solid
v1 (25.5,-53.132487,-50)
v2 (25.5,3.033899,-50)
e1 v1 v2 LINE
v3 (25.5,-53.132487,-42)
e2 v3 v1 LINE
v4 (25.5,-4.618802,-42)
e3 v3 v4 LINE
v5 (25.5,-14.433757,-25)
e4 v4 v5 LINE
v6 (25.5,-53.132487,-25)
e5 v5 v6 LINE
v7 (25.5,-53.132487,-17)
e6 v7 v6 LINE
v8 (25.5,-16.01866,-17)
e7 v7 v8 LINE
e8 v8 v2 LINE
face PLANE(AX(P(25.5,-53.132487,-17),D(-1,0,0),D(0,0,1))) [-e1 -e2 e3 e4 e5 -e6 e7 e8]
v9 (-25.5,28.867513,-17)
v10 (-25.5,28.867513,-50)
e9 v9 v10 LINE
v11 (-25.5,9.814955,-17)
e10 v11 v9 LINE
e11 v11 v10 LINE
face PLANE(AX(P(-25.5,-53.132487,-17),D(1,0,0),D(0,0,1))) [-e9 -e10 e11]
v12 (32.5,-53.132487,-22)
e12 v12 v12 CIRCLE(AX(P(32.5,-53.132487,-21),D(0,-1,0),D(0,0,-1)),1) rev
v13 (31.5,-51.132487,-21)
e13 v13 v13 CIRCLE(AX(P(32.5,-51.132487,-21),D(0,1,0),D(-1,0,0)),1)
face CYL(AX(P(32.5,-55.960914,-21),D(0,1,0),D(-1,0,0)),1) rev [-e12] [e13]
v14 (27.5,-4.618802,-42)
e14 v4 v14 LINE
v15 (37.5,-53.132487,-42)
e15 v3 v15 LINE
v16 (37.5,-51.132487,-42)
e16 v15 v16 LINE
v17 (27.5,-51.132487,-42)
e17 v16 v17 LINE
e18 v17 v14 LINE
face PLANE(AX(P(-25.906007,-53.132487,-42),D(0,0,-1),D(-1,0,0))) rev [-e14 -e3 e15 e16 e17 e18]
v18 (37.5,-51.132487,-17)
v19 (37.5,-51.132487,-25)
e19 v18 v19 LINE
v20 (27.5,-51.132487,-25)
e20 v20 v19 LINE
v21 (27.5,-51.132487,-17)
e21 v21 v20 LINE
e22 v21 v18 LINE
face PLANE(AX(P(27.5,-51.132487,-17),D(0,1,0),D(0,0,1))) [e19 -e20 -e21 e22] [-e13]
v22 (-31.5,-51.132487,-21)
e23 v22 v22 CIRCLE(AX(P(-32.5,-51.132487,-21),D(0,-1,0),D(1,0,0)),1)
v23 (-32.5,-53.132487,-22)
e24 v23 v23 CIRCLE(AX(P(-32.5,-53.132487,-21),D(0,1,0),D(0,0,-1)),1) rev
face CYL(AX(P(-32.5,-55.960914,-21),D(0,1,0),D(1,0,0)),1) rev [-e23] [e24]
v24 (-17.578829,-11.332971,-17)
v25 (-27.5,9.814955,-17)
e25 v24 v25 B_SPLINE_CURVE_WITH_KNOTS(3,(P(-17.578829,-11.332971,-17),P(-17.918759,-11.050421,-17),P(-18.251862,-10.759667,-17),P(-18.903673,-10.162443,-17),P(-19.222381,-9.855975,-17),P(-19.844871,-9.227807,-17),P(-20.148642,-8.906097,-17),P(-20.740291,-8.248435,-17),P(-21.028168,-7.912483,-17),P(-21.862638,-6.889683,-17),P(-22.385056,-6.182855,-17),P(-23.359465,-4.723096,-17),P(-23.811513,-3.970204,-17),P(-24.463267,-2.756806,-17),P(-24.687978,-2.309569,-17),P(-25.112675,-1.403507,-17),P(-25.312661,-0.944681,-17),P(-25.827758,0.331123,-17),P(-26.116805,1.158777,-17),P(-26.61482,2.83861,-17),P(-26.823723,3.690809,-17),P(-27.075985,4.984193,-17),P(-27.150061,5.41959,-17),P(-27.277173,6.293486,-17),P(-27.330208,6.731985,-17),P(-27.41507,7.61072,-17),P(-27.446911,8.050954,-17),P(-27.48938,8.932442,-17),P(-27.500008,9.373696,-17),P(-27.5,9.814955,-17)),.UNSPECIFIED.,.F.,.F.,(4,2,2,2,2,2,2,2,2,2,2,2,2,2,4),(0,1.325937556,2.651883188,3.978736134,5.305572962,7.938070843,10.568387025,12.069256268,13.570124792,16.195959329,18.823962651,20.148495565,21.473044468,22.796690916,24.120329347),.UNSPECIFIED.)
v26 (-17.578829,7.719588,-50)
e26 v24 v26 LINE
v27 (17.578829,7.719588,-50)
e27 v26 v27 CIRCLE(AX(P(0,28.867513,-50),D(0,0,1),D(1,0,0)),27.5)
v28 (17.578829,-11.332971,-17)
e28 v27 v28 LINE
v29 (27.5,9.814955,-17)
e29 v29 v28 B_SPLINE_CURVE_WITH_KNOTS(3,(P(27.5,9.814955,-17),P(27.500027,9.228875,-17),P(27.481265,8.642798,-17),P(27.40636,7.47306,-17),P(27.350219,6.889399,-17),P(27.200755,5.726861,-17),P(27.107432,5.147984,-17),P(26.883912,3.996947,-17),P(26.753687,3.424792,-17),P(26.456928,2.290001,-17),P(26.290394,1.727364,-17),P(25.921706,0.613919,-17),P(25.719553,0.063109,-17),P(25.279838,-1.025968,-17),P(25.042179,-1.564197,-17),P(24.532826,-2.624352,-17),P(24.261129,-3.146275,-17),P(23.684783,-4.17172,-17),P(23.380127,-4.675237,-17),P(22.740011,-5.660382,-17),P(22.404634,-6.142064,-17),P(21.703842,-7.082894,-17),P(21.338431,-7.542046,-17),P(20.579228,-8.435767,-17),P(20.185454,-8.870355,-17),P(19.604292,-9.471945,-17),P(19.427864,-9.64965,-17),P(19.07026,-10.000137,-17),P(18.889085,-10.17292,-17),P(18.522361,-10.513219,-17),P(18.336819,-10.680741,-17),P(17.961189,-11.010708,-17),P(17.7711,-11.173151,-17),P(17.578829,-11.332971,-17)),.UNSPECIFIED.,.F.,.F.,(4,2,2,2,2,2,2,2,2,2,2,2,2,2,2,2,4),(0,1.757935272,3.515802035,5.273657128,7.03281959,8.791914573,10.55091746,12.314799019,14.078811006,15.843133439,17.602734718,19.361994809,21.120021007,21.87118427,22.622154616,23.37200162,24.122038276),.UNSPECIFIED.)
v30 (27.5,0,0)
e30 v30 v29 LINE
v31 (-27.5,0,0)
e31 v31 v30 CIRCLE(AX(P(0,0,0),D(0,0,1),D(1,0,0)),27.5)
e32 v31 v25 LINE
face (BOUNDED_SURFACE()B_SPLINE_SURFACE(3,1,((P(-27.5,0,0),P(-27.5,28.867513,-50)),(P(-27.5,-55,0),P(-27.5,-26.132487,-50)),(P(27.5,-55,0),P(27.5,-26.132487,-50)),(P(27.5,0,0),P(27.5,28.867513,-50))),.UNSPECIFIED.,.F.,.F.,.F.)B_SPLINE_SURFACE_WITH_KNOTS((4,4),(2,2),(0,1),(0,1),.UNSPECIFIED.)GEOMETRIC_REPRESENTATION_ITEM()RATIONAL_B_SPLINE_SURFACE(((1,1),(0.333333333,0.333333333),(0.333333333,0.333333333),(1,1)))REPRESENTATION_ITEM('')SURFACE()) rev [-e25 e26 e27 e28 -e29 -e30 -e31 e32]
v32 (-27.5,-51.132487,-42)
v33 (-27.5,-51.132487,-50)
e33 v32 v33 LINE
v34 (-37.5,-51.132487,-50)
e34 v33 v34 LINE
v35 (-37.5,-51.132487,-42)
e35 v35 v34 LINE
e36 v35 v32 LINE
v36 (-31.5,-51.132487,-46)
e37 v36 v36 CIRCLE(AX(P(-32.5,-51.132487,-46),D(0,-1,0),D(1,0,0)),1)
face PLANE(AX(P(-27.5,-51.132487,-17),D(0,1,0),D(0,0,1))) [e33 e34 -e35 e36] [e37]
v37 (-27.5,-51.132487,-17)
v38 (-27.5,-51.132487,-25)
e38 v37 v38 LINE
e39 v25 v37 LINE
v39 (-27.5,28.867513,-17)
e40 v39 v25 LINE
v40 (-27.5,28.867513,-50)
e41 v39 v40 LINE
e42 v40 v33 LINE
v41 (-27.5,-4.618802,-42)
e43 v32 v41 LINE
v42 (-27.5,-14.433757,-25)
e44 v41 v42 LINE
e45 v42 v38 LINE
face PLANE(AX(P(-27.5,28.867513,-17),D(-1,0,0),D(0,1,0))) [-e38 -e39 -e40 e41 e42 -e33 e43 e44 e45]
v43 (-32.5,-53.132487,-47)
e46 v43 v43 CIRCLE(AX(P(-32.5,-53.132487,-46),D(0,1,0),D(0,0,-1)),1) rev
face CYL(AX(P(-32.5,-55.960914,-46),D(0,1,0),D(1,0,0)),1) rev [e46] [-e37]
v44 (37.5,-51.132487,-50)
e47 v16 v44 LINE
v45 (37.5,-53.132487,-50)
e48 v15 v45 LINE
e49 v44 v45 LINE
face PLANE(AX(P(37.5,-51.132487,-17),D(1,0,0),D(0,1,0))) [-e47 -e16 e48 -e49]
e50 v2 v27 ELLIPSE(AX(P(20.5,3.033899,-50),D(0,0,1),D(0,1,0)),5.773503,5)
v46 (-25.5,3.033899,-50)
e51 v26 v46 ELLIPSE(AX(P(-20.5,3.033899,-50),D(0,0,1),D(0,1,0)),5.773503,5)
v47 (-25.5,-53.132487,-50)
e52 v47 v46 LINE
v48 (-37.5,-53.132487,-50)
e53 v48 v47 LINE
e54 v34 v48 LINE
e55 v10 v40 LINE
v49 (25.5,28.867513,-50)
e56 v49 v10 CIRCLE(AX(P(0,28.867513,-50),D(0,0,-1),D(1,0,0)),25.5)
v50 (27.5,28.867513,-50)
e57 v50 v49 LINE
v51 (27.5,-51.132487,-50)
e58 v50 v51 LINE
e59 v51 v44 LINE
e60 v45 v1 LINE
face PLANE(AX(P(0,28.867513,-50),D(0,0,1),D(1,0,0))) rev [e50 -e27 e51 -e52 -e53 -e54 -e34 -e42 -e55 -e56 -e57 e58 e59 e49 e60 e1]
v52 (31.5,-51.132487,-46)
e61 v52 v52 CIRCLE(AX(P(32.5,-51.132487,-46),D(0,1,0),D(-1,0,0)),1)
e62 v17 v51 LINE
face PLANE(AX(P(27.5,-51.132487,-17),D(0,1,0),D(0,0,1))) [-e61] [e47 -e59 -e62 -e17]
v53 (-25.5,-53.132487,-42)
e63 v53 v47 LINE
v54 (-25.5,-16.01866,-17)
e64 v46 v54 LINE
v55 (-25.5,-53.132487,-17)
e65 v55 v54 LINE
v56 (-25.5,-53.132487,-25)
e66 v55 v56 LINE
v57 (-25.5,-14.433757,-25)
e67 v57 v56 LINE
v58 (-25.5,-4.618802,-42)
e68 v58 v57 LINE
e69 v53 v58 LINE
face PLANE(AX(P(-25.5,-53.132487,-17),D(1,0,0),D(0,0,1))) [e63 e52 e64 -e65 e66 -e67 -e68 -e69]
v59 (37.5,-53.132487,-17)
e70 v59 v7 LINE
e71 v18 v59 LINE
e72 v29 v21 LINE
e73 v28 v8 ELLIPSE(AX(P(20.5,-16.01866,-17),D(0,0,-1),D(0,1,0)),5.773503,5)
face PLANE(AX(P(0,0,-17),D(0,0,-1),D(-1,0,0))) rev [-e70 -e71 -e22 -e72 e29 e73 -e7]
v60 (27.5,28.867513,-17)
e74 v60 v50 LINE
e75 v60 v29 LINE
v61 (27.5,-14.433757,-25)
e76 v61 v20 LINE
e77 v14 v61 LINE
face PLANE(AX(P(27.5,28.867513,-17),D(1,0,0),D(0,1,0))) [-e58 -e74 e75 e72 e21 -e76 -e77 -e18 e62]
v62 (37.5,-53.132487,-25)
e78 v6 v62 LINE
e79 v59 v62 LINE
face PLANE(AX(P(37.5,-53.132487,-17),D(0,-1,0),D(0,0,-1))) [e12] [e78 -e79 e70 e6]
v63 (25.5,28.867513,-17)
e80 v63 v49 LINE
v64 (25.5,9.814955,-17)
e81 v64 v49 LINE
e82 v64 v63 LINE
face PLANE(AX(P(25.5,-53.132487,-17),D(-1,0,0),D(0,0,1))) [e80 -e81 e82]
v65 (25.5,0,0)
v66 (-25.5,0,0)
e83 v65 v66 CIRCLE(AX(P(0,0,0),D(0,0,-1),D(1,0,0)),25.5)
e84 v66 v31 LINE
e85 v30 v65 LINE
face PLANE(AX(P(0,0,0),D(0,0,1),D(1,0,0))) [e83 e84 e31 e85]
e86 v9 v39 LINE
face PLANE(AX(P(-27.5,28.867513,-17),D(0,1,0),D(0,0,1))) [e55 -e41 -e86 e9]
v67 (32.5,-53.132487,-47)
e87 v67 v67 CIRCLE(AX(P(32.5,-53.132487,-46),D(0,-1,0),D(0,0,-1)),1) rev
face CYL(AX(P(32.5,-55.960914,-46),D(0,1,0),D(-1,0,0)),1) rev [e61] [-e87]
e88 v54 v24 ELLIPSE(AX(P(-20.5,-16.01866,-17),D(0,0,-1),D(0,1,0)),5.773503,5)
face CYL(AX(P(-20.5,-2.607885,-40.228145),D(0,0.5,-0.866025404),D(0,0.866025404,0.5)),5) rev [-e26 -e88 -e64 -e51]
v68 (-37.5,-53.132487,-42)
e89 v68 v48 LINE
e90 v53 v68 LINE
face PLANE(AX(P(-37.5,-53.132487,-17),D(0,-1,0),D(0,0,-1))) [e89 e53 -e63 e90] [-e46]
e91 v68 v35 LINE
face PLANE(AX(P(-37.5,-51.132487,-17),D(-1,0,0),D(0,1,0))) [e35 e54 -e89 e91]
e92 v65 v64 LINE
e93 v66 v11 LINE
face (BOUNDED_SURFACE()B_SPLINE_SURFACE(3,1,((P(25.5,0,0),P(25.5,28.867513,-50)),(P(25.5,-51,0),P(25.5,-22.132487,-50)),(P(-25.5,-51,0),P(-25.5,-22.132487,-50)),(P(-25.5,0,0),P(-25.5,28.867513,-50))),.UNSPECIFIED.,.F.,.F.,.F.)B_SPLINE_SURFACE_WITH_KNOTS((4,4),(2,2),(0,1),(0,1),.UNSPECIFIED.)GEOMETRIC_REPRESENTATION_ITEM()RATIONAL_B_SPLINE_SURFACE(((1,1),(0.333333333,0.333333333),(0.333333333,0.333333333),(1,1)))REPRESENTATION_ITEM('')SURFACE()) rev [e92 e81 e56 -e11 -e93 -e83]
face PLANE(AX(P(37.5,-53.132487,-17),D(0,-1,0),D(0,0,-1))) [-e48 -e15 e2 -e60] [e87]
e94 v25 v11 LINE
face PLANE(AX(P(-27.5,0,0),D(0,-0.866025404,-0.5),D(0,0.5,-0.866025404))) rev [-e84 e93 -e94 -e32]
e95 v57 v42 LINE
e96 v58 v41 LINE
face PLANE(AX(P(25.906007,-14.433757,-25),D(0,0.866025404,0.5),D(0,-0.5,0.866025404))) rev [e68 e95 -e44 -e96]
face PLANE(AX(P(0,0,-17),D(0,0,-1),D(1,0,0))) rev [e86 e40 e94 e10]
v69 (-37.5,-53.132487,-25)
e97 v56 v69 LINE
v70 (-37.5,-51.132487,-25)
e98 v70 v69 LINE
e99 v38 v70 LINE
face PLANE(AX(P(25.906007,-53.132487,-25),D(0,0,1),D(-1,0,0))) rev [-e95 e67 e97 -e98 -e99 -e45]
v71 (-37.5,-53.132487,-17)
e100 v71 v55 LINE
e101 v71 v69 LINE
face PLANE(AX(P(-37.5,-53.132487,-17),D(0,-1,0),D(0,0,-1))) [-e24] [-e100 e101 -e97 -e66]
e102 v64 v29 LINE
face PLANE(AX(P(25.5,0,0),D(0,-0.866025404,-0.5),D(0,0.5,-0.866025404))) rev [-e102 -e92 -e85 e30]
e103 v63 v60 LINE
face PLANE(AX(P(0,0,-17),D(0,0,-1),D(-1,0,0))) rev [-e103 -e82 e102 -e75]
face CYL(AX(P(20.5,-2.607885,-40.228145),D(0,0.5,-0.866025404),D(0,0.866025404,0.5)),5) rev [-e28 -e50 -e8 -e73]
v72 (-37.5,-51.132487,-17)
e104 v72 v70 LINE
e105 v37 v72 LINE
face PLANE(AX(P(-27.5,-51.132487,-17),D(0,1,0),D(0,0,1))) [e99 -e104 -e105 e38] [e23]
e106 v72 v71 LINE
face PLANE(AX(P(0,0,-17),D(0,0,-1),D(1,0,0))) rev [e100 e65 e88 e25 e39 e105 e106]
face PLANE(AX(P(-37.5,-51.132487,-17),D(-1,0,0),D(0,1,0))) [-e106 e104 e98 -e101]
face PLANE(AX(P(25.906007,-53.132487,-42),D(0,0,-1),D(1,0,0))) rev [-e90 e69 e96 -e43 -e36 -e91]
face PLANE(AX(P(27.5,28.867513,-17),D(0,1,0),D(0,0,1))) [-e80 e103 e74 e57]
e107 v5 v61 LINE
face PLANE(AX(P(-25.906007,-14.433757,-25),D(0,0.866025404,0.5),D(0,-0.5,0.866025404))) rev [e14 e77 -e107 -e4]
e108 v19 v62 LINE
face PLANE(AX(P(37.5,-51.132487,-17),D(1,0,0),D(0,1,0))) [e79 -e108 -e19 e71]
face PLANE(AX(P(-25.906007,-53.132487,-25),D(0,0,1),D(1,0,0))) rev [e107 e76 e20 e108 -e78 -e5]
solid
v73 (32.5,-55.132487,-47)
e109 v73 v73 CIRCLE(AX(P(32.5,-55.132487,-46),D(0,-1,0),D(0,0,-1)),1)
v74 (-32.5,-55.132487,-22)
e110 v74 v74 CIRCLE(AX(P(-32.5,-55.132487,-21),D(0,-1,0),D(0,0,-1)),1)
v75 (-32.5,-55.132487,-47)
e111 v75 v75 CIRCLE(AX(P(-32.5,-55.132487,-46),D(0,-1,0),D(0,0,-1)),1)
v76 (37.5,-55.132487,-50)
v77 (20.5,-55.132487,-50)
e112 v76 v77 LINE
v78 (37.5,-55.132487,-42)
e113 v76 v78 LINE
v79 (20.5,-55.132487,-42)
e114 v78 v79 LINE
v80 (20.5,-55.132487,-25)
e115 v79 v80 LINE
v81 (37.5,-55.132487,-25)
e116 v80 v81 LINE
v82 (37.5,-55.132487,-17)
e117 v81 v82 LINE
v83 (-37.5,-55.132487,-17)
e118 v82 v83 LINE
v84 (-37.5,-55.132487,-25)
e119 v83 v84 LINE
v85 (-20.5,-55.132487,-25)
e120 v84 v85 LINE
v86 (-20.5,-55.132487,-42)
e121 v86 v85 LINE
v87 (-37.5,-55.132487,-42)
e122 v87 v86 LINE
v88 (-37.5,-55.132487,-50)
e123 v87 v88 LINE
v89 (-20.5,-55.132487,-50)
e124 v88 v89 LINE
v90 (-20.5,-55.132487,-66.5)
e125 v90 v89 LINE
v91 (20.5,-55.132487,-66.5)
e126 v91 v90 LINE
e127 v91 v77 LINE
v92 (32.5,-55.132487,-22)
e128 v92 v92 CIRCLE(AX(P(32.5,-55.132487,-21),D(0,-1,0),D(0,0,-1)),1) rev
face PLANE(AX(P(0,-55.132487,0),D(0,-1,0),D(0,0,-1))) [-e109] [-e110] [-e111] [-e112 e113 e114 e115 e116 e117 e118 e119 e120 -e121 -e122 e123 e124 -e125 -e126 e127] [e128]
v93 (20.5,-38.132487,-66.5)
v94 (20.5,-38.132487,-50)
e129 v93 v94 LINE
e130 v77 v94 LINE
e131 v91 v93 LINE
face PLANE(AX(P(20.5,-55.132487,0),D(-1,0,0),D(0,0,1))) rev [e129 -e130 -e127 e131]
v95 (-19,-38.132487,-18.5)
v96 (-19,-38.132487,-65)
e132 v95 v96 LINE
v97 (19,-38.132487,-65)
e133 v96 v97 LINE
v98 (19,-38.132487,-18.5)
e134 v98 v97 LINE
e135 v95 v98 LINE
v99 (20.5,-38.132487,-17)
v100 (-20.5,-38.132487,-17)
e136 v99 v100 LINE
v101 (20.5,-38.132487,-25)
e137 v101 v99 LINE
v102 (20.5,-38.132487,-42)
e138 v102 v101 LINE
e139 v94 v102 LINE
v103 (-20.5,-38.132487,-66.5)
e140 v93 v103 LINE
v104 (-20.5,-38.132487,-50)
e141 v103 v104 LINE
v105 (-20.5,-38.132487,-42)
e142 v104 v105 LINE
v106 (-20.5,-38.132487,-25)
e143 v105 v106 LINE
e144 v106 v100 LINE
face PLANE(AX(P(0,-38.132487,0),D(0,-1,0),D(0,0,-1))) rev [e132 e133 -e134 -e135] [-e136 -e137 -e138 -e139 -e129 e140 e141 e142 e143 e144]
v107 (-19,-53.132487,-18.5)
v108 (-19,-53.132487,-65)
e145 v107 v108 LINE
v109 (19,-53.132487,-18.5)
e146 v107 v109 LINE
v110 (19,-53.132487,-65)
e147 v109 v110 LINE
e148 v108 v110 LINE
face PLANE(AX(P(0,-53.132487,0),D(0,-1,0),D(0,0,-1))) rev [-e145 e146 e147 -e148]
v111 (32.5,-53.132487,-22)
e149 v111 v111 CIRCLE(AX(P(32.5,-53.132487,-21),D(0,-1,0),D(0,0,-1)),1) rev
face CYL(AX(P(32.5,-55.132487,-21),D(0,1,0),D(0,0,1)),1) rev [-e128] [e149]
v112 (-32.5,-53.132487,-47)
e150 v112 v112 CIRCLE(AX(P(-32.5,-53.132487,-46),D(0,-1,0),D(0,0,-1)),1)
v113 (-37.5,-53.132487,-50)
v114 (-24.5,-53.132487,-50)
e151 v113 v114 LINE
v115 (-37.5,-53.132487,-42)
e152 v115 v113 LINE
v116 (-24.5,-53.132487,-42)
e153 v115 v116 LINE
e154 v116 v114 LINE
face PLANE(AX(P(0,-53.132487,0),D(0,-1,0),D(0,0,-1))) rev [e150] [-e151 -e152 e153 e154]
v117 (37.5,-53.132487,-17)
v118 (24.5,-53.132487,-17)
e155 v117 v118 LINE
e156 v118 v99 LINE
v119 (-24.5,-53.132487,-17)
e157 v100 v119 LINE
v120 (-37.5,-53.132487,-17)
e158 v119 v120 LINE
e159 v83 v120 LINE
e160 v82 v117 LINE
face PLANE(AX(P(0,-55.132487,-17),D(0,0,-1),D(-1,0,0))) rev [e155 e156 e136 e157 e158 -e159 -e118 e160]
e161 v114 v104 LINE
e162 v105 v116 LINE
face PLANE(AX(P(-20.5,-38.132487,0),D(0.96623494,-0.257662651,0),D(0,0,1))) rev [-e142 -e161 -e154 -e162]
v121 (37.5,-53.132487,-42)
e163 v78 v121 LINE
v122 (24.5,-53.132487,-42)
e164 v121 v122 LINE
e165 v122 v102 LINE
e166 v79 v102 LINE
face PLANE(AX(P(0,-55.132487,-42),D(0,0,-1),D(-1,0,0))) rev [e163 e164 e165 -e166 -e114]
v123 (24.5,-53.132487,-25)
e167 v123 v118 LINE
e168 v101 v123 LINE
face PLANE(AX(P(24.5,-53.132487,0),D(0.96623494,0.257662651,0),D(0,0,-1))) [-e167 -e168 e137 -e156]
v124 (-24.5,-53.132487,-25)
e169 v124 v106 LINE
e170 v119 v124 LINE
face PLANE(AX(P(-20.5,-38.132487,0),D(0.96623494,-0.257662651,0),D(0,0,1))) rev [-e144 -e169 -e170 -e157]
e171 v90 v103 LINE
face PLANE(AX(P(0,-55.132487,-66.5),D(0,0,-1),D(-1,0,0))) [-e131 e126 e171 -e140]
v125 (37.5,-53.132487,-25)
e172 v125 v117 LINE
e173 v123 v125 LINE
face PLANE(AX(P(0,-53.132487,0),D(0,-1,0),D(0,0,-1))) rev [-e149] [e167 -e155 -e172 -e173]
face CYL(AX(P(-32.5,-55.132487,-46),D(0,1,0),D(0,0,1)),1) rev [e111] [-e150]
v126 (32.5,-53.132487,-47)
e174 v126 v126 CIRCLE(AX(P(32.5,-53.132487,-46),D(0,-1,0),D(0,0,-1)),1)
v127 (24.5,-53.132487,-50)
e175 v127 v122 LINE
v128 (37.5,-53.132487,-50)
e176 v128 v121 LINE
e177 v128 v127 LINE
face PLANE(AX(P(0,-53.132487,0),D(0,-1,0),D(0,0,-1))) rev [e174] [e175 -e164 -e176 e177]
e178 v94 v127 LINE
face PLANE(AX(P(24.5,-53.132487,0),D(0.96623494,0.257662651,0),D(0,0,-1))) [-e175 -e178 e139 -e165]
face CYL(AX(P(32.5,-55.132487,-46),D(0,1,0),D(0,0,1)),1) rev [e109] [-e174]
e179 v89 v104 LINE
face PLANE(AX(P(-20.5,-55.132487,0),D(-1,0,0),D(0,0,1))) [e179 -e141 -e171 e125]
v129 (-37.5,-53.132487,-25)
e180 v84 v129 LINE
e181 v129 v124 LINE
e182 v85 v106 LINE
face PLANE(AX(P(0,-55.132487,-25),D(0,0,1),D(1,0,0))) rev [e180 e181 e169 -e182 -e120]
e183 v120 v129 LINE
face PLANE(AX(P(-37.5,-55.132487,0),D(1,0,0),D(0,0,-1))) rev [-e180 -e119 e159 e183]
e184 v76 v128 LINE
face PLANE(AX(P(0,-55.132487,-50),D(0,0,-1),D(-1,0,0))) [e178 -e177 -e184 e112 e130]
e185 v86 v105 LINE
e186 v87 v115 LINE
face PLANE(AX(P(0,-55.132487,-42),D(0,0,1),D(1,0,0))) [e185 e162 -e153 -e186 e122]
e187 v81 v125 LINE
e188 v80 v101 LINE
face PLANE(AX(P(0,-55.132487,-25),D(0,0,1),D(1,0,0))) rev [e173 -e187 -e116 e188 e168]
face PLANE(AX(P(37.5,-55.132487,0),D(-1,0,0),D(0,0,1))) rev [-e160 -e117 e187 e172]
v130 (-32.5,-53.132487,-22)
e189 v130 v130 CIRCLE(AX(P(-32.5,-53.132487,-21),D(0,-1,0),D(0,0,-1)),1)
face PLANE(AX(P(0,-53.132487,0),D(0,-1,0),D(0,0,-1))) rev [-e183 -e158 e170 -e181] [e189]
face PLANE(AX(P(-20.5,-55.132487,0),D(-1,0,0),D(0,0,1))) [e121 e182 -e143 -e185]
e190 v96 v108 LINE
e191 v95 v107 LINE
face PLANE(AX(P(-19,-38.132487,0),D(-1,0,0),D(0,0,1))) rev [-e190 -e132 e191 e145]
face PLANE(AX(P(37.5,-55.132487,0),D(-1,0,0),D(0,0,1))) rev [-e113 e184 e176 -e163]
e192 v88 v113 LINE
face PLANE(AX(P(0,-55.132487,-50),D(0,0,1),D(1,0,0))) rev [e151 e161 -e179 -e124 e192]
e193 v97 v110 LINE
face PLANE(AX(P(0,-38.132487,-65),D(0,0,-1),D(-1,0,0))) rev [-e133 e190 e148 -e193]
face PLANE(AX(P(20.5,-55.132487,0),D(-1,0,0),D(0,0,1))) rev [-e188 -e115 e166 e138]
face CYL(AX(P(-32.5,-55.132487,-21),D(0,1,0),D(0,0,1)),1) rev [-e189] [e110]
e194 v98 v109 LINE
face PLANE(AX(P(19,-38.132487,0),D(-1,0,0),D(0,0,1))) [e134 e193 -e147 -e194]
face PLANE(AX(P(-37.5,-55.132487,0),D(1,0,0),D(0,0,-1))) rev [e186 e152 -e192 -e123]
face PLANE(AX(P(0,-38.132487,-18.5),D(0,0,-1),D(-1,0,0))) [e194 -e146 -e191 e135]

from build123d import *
from OCP.BRepFilletAPI import BRepFilletAPI_MakeChamfer

# Parameters (mm, degrees)
BOSS_EXTRUDE1_DEPTH     = 33
CUT_EXTRUDE1_REACH      = 99.714
SKETCH5_R               = 1
CUT_EXTRUDE2_DEPTH      = 2
FILLET1_R               = 5
BOSS_EXTRUDE3_OUTLINE_R = 1
BOSS_EXTRUDE3_DEPTH     = 2
SKETCH6_3_W             = 38
SKETCH6_3_H             = 46.5
BOSS_EXTRUDE4_DEPTH     = 15
CHAMFER1_SIZE           = 15
CHAMFER1_SIZE_2         = 4
CHAMFER2_SIZE           = 15
CHAMFER2_SIZE_2         = 4


with BuildPart() as part:
    # Sweep1: sweep along a path in Sketch2
    with BuildLine(Plane(origin=(0, 0, 0), x_dir=(0, 0, -1), z_dir=(1, 0, 0))) as sweep1_path:
        Line((0, 0), (50, 28.867513459))
    # Sketch1 → Sweep1 (sweep)
    with BuildSketch(Plane.XY):
        with BuildLine():
            Line((-27.5, 0), (-25.5, 0))
            ThreePointArc((-25.5, 0), (0, -25.5), (25.5, 0))
            Line((25.5, 0), (27.5, 0))
            ThreePointArc((27.5, 0), (0, -27.5), (-27.5, 0))
        make_face()
    sweep(path=sweep1_path.line)


with BuildPart() as body_2:
    # Sketch3 → Boss-Extrude1 (new body)
    with BuildSketch(Plane(origin=(0, 0, -50), x_dir=(-1, 0, 0), z_dir=(0, 0, -1))):
        Polygon((-27.5, 28.867513459), (-27.5, -51.132486541), (-37.5, -51.132486541), (-37.5, -53.132486541), (-25.5, -53.132486541), (-25.5, 28.867513459), align=None)
    extrude(amount=-BOSS_EXTRUDE1_DEPTH)

    # Cut-Extrude1: up to this face of the body (flat: up to its plane)
    cut_extrude1_end = Plane(body_2.part.faces().sort_by_distance((25.5, -12.132486541, -33.5))[0])
    # Sketch4 → Cut-Extrude1 (cut, up to the picked face)
    with BuildSketch(Plane(origin=(37.5, 0, 0), x_dir=(0, 0, -1), z_dir=(1, 0, 0)), mode=Mode.PRIVATE) as cut_extrude1_sk1:
        Polygon((25, -53.132486541), (42, -53.132486541), (42, -4.618802154), (25, -14.43375673), align=None)
    cut_extrude1_tool1 = split(extrude(cut_extrude1_sk1.sketch, amount=-CUT_EXTRUDE1_REACH, mode=Mode.PRIVATE), bisect_by=cut_extrude1_end, keep=Keep.BOTH, mode=Mode.PRIVATE)
    add(cut_extrude1_tool1.solids().sort_by(Axis((37.5, -31.237334, -33.818866), (-1, 0, 0)))[0], mode=Mode.SUBTRACT)

    # Sketch5 → Cut-Extrude2 (cut)
    with BuildSketch(Plane(origin=(0, -51.132486541, 0), x_dir=(1, 0, 0), z_dir=(0, 1, 0))):
        with Locations(Location((32.5, 21, 0), (0, 0, 180))):
            Circle(SKETCH5_R)
        with Locations(Location((32.5, 46, 0), (0, 0, 180))):
            Circle(SKETCH5_R)
    extrude(amount=-CUT_EXTRUDE2_DEPTH, mode=Mode.SUBTRACT)


with BuildPart() as body_3:
    # Mirror1: mirrored copy
    add(body_2.part.mirror(Plane(origin=(0, 0, 0), x_dir=(0, 0, 1), z_dir=(1, 0, 0))))


with BuildPart() as part_1:
    add(part.part)

    # Intersect1: read off the stored shape, not the designer's step
    # Intersect1: union body 3, body 2
    add(body_3.part)
    add(body_2.part)

    # Fillet1
    fillet1_edges = [part_1.edges().sort_by_distance(p)[0] for p in [
        (25.5, 9.045603877, -33.5),
        (-25.5, 9.045603877, -33.5),
    ]]
    fillet(fillet1_edges, radius=FILLET1_R)


with BuildPart() as body_2_2:
    # Boss-Extrude3: read off the stored shape, not the designer's step
    # Boss-Extrude3 outline → Boss-Extrude3 (new body)
    with BuildSketch(Plane.XZ.offset(53.132486541)):
        Polygon((37.5, -17), (-37.5, -17), (-37.5, -25), (-20.5, -25), (-20.5, -42), (-37.5, -42), (-37.5, -50), (-20.5, -50), (-20.5, -66.5), (20.5, -66.5), (20.5, -50), (37.5, -50), (37.5, -42), (20.5, -42), (20.5, -25), (37.5, -25), align=None)
        with Locations((-32.5, -46)):
            Circle(BOSS_EXTRUDE3_OUTLINE_R, mode=Mode.SUBTRACT)
        with Locations((32.5, -46)):
            Circle(BOSS_EXTRUDE3_OUTLINE_R, mode=Mode.SUBTRACT)
        with Locations((-32.5, -21)):
            Circle(BOSS_EXTRUDE3_OUTLINE_R, mode=Mode.SUBTRACT)
        with Locations((32.5, -21)):
            Circle(BOSS_EXTRUDE3_OUTLINE_R, mode=Mode.SUBTRACT)
    extrude(amount=BOSS_EXTRUDE3_DEPTH)

    # Sketch6<3> → Boss-Extrude4 (add)
    with BuildSketch(Plane.XZ.offset(53.132486541)):
        Polygon((20.5, -66.5), (20.5, -50), (20.5, -42), (20.5, -25), (20.5, -17), (-20.5, -17), (-20.5, -25), (-20.5, -42), (-20.5, -50), (-20.5, -66.5), align=None)
        with Locations((0, -41.75)):
            Rectangle(SKETCH6_3_W, SKETCH6_3_H, mode=Mode.SUBTRACT)
    extrude(amount=-BOSS_EXTRUDE4_DEPTH)

    # Chamfer1
    chamfer1_edges_1 = [body_2_2.edges().sort_by_distance(p)[0] for p in [
        (-20.5, -53.132486541, -46),
    ]]
    chamfer1_side_1 = [body_2_2.faces().sort_by_distance(p)[0] for p in [
        (-20.5, -53.052486541, -46),
    ]]
    chamfer1_edges_2 = [body_2_2.edges().sort_by_distance(p)[0] for p in [
        (-20.5, -53.132486541, -21),
    ]]
    chamfer1_side_2 = [body_2_2.faces().sort_by_distance(p)[0] for p in [
        (-20.5, -53.052486541, -21),
    ]]
    chamfer1 = BRepFilletAPI_MakeChamfer(body_2_2.part.solid().wrapped)
    for e in chamfer1_edges_1:
        chamfer1.Add(CHAMFER1_SIZE - 0.0001, CHAMFER1_SIZE_2 - 0.0001, e.wrapped, chamfer1_side_1[0].wrapped)
    for e in chamfer1_edges_2:
        chamfer1.Add(CHAMFER1_SIZE - 0.0001, CHAMFER1_SIZE_2 - 0.0001, e.wrapped, chamfer1_side_2[0].wrapped)
    add(Compound.cast(chamfer1.Shape()), mode=Mode.REPLACE)  # a hair under: the kernel refuses the full size

    # Chamfer2
    chamfer2_edges_1 = [body_2_2.edges().sort_by_distance(p)[0] for p in [
        (20.5, -53.132486541, -46),
    ]]
    chamfer2_side_1 = [body_2_2.faces().sort_by_distance(p)[0] for p in [
        (20.5, -53.052486541, -46),
    ]]
    chamfer2_edges_2 = [body_2_2.edges().sort_by_distance(p)[0] for p in [
        (20.5, -53.132486541, -21),
    ]]
    chamfer2_side_2 = [body_2_2.faces().sort_by_distance(p)[0] for p in [
        (20.58, -53.132486541, -21),
    ]]
    chamfer2 = BRepFilletAPI_MakeChamfer(body_2_2.part.solid().wrapped)
    for e in chamfer2_edges_1:
        chamfer2.Add(CHAMFER2_SIZE - 0.0001, CHAMFER2_SIZE_2 - 0.0001, e.wrapped, chamfer2_side_1[0].wrapped)
    for e in chamfer2_edges_2:
        chamfer2.Add(CHAMFER2_SIZE_2 - 0.0001, CHAMFER2_SIZE - 0.0001, e.wrapped, chamfer2_side_2[0].wrapped)
    add(Compound.cast(chamfer2.Shape()), mode=Mode.REPLACE)  # a hair under: the kernel refuses the full size


solid = Compound([part_1.part, body_2_2.part])
